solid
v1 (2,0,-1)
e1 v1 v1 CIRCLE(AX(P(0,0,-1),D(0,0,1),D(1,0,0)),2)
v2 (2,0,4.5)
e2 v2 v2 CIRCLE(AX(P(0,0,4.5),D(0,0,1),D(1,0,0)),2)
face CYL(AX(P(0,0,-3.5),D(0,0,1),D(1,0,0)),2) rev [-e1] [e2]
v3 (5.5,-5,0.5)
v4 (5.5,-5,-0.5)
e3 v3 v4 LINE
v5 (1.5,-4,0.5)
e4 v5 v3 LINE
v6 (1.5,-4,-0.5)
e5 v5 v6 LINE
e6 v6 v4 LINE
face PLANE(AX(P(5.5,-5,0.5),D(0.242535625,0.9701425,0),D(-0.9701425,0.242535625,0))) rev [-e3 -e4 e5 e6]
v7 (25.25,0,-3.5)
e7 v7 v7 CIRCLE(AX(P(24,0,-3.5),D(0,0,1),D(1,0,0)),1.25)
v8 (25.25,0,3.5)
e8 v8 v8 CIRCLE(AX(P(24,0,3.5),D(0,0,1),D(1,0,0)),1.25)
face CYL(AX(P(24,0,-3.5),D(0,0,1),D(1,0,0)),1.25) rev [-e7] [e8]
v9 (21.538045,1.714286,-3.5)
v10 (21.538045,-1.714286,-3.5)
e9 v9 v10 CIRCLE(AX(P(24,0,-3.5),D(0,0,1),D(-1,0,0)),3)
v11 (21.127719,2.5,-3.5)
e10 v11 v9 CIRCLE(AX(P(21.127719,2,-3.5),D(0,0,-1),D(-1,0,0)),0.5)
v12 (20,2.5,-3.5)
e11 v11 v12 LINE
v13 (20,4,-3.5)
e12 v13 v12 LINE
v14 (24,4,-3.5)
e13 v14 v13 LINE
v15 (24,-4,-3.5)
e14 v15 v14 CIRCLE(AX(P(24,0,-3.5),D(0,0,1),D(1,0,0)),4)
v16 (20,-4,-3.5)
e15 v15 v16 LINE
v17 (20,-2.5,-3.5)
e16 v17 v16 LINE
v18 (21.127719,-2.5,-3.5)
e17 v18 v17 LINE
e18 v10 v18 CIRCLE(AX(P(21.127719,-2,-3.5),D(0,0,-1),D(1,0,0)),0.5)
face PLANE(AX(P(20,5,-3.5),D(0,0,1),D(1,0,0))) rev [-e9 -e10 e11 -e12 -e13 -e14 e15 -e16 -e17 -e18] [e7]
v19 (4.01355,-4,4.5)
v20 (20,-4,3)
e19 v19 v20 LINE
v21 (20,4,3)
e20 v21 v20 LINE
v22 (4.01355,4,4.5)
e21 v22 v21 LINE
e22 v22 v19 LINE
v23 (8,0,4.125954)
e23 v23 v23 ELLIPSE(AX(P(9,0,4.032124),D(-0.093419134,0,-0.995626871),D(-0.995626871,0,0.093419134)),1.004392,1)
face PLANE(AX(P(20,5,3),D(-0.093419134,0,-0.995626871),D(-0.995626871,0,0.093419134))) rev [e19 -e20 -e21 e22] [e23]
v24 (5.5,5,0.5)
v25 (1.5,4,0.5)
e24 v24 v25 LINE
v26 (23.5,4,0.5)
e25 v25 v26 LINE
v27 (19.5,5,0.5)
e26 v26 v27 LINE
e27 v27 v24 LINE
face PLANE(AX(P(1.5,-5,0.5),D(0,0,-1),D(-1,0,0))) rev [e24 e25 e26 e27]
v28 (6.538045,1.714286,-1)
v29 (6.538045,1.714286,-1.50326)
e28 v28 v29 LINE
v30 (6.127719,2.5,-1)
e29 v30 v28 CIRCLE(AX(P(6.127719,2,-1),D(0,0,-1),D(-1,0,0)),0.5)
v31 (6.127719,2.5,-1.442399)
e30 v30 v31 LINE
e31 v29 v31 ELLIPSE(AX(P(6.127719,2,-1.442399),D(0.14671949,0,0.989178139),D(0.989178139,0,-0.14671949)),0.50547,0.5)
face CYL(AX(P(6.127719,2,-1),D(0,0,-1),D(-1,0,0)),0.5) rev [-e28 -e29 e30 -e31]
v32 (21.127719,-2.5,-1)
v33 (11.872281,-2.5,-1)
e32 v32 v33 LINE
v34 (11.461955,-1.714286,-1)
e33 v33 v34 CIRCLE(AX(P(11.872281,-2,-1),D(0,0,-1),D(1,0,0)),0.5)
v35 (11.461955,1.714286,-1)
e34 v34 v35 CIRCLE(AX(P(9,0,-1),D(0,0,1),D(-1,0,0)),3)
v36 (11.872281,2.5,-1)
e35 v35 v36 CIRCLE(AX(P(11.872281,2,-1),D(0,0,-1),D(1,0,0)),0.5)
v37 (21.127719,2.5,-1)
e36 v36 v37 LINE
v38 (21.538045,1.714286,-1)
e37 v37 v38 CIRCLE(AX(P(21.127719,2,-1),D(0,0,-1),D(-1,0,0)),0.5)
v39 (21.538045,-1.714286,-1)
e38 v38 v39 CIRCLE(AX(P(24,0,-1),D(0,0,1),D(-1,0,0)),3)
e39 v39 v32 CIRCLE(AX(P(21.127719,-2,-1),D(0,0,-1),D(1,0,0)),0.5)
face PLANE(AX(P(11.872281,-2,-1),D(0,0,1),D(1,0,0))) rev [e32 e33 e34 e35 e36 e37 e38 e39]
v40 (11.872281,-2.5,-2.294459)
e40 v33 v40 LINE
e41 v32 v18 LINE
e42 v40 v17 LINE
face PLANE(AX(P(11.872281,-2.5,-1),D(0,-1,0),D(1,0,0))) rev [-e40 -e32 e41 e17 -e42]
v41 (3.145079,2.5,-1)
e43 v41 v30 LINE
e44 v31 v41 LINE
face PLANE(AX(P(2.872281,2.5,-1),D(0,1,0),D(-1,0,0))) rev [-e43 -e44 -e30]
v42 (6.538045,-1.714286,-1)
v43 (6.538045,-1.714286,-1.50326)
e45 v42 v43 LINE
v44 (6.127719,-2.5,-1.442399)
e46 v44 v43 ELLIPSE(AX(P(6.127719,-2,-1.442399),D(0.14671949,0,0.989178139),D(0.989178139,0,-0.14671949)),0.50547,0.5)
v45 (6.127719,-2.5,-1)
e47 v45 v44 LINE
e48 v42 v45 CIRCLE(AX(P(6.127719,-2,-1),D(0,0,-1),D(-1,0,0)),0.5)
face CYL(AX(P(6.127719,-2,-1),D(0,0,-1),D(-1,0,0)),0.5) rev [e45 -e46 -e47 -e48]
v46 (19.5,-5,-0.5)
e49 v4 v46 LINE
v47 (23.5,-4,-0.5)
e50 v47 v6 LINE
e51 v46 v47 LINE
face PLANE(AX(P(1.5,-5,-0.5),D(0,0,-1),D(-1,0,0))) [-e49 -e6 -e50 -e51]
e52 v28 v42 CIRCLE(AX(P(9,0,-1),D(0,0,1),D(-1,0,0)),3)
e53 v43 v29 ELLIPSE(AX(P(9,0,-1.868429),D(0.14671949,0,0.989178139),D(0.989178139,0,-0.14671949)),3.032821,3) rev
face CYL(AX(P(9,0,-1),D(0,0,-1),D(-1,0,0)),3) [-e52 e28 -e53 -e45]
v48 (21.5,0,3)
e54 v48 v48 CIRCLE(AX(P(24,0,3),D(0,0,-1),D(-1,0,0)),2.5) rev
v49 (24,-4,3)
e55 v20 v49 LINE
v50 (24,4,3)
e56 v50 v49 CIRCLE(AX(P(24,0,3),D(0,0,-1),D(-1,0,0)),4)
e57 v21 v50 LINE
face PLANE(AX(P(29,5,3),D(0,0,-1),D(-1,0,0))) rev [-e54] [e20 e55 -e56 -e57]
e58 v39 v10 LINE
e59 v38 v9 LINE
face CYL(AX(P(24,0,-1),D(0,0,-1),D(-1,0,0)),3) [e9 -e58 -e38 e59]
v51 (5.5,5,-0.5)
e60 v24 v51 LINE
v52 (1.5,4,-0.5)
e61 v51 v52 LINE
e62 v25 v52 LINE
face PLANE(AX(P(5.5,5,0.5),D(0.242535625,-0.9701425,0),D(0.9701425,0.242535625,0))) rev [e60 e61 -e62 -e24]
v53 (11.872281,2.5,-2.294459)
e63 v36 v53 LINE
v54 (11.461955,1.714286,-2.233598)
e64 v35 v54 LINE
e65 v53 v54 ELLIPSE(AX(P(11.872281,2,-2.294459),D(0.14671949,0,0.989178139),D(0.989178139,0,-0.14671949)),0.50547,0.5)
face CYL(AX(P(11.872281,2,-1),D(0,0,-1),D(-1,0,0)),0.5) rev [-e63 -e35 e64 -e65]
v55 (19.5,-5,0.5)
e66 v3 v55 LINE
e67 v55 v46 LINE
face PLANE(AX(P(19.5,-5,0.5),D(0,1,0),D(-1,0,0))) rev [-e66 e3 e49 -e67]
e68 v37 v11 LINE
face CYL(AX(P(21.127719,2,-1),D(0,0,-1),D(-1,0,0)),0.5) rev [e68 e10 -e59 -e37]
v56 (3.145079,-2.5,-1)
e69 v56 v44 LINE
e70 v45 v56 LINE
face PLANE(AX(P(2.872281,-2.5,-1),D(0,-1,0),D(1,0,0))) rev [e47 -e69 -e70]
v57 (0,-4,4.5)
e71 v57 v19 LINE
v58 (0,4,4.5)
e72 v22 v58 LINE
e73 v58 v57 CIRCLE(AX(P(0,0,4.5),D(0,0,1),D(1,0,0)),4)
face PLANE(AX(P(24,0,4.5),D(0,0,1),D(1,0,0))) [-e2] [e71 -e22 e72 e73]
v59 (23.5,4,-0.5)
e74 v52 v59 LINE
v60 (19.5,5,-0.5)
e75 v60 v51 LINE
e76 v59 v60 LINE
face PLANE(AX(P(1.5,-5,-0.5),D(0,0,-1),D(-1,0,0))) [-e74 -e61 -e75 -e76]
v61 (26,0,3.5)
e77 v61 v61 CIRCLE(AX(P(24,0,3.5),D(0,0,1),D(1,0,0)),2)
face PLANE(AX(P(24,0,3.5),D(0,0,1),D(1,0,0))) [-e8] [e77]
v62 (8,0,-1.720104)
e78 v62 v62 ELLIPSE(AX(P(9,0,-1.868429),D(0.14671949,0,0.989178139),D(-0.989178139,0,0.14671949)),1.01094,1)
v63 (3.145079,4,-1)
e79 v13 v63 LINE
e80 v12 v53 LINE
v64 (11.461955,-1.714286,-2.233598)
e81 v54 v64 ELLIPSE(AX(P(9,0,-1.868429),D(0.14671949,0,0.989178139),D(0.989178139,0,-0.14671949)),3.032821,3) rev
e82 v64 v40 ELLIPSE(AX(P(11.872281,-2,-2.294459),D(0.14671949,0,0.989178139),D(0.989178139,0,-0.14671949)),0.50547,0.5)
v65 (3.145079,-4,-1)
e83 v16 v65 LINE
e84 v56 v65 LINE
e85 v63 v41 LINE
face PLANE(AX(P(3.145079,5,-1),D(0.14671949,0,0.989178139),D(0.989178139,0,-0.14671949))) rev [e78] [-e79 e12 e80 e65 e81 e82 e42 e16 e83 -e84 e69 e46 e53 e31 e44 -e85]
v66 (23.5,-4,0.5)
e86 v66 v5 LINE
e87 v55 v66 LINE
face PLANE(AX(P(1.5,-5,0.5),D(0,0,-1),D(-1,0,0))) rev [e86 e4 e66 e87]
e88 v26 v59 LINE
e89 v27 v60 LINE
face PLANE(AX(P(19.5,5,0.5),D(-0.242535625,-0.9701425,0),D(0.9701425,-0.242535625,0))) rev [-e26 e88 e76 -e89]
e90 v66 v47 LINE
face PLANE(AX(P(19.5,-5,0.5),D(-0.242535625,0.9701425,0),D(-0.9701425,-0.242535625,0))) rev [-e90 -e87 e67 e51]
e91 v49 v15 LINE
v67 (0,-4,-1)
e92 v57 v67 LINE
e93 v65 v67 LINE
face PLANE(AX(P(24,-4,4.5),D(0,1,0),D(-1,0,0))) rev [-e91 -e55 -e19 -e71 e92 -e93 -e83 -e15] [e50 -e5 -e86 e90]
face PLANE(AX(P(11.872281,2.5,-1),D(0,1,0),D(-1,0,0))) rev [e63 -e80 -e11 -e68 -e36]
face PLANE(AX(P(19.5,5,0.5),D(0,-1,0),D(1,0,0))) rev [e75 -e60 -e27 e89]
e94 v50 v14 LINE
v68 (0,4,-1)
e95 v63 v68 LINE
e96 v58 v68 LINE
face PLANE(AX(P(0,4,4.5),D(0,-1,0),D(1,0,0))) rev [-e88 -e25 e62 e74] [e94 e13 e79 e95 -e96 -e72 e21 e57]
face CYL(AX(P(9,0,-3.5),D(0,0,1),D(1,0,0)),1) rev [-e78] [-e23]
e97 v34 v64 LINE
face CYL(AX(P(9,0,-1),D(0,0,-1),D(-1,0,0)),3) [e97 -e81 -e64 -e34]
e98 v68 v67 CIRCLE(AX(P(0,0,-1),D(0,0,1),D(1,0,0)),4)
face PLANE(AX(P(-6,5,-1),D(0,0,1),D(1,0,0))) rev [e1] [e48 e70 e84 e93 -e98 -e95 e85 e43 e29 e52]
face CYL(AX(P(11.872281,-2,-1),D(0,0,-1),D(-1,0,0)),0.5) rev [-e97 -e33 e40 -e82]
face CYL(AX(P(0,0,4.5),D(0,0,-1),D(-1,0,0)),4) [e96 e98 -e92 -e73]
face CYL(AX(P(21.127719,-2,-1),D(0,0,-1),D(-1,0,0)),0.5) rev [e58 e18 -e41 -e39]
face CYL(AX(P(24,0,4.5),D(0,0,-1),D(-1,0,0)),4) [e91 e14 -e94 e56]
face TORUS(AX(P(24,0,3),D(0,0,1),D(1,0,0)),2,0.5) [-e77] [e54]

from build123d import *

# Parameters (mm, degrees)
BASE_EXTRUSION_DEPTH    = 4.5
BOSS_EXTRU_1_DEPTH      = 0.5
ENL_V_MAT_EXTRU_1_DEPTH = 30.753151094
ENL_V_MAT_EXTRU_2_DEPTH = 30.753151094
ESQUISSE5_R             = 1.25
ESQUISSE5_R_2           = 1
ENL_V_MAT_EXTRU_3_DEPTH = 30.546573405
ESQUISSE11_R            = 2.5
BOSS_EXTRU_2_DEPTH      = 0.5
CONG_1_R                = 0.5
ESQUISSE12_R            = 1.25
ENL_V_MAT_EXTRU_5_DEPTH = 30.291637032
ESQUISSE13_R            = 2
ENL_V_MAT_EXTRU_6_DEPTH = 30.546573405
ENL_V_MAT_EXTRU_7_DEPTH = 2.5


with BuildPart() as part:
    # Esquisse1 → Base-Extrusion (new, symmetric)
    with BuildSketch(Plane.XY):
        with BuildLine():
            Line((0, 4), (24, 4))
            ThreePointArc((24, 4), (28, 0), (24, -4))
            Line((24, -4), (0, -4))
            ThreePointArc((0, -4), (-4, 0), (0, 4))
        make_face()
    extrude(amount=BASE_EXTRUSION_DEPTH, both=True)

    # Esquisse2 → Boss.-Extru.1 (add, symmetric)
    with BuildSketch(Plane.XY):
        Polygon((5.5, 5), (1.5, 4), (1.5, -4), (5.5, -5), (19.5, -5), (23.5, -4), (23.5, 4), (19.5, 5), align=None)
    extrude(amount=BOSS_EXTRU_1_DEPTH, both=True)

    # Esquisse3 → Enlèv. mat.-Extru.1 (cut, through all)
    with BuildSketch(Plane.XZ.offset(4)):
        Polygon((29, 3), (20, 3), (4.013550136, 4.5), (-6, 4.5), (-6, 6), (29, 6), align=None)
    extrude(amount=-ENL_V_MAT_EXTRU_1_DEPTH, mode=Mode.SUBTRACT)

    # Esquisse4 → Enlèv. mat.-Extru.2 (cut, through all)
    with BuildSketch(Plane.XZ.offset(4)):
        Polygon((-6, -1), (3.145079466, -1), (20, -3.5), (29.207616232, -3.5), (29.207616232, -4.5), (29.207616232, -7.5), (-6, -7.5), align=None)
    extrude(amount=-ENL_V_MAT_EXTRU_2_DEPTH, mode=Mode.SUBTRACT)

    # Esquisse5 → Enlèv. mat.-Extru.3 (cut, through all)
    with BuildSketch(Plane.XY.offset(4.5)):
        with Locations((24, 0)):
            Circle(ESQUISSE5_R)
        with Locations(Location((9, 0, 0), (0, 0, 180))):
            Circle(ESQUISSE5_R_2)
    extrude(amount=-ENL_V_MAT_EXTRU_3_DEPTH, mode=Mode.SUBTRACT)

    # Esquisse11 → Boss.-Extru.2 (add)
    with BuildSketch(Plane.XY.offset(3)):
        with Locations((24, 0)):
            Circle(ESQUISSE11_R)
    extrude(amount=BOSS_EXTRU_2_DEPTH)

    # Congé1
    cong_1_edges = [part.edges().sort_by_distance(p)[0] for p in [
        (21.5, 0, 3.5),
    ]]
    fillet(cong_1_edges, radius=CONG_1_R - 0.0001)  # a hair under: the kernel refuses the full size

    # Esquisse12 → Enlèv. mat.-Extru.5 (cut, through all)
    with BuildSketch(Plane.XY.offset(3.5)):
        with Locations((24, 0)):
            Circle(ESQUISSE12_R)
    extrude(amount=-ENL_V_MAT_EXTRU_5_DEPTH, mode=Mode.SUBTRACT)

    # Esquisse13 → Enlèv. mat.-Extru.6 (cut, through all)
    with BuildSketch(Plane.XY.offset(4.5)):
        Circle(ESQUISSE13_R)
    extrude(amount=-ENL_V_MAT_EXTRU_6_DEPTH, mode=Mode.SUBTRACT)

    # Esquisse14 → Enlèv. mat.-Extru.7 (cut)
    with BuildSketch(Plane(origin=(0, 0, -3.5), x_dir=(-1, 0, 0), z_dir=(0, 0, -1))):
        with BuildLine():
            Line((-2.872281323, 2.5), (-6.127718677, 2.5))
            ThreePointArc((-6.127718677, 2.5), (-6.570921307, 2.231455025), (-6.53804458, 1.714285714))
            ThreePointArc((-6.53804458, 1.714285714), (-6, 0), (-6.53804458, -1.714285714))
            ThreePointArc((-6.53804458, -1.714285714), (-6.570921307, -2.231455025), (-6.127718677, -2.5))
            Line((-6.127718677, -2.5), (-2.872281323, -2.5))
            ThreePointArc((-2.872281323, -2.5), (-2.429078693, -2.231455025), (-2.46195542, -1.714285714))
            ThreePointArc((-2.46195542, -1.714285714), (-3, 0), (-2.46195542, 1.714285714))
            ThreePointArc((-2.46195542, 1.714285714), (-2.429078693, 2.231455025), (-2.872281323, 2.5))
        make_face()
        with BuildLine():
            Line((-11.872281323, -2.5), (-21.127718677, -2.5))
            ThreePointArc((-21.127718677, -2.5), (-21.570921307, -2.231455025), (-21.53804458, -1.714285714))
            ThreePointArc((-21.53804458, -1.714285714), (-21, 0), (-21.53804458, 1.714285714))
            ThreePointArc((-21.53804458, 1.714285714), (-21.570921307, 2.231455025), (-21.127718677, 2.5))
            Line((-21.127718677, 2.5), (-11.872281323, 2.5))
            ThreePointArc((-11.872281323, 2.5), (-11.429078693, 2.231455025), (-11.46195542, 1.714285714))
            ThreePointArc((-11.46195542, 1.714285714), (-12, 0), (-11.46195542, -1.714285714))
            ThreePointArc((-11.46195542, -1.714285714), (-11.429078693, -2.231455025), (-11.872281323, -2.5))
        make_face()
    extrude(amount=-ENL_V_MAT_EXTRU_7_DEPTH, mode=Mode.SUBTRACT)


solid = part.part
